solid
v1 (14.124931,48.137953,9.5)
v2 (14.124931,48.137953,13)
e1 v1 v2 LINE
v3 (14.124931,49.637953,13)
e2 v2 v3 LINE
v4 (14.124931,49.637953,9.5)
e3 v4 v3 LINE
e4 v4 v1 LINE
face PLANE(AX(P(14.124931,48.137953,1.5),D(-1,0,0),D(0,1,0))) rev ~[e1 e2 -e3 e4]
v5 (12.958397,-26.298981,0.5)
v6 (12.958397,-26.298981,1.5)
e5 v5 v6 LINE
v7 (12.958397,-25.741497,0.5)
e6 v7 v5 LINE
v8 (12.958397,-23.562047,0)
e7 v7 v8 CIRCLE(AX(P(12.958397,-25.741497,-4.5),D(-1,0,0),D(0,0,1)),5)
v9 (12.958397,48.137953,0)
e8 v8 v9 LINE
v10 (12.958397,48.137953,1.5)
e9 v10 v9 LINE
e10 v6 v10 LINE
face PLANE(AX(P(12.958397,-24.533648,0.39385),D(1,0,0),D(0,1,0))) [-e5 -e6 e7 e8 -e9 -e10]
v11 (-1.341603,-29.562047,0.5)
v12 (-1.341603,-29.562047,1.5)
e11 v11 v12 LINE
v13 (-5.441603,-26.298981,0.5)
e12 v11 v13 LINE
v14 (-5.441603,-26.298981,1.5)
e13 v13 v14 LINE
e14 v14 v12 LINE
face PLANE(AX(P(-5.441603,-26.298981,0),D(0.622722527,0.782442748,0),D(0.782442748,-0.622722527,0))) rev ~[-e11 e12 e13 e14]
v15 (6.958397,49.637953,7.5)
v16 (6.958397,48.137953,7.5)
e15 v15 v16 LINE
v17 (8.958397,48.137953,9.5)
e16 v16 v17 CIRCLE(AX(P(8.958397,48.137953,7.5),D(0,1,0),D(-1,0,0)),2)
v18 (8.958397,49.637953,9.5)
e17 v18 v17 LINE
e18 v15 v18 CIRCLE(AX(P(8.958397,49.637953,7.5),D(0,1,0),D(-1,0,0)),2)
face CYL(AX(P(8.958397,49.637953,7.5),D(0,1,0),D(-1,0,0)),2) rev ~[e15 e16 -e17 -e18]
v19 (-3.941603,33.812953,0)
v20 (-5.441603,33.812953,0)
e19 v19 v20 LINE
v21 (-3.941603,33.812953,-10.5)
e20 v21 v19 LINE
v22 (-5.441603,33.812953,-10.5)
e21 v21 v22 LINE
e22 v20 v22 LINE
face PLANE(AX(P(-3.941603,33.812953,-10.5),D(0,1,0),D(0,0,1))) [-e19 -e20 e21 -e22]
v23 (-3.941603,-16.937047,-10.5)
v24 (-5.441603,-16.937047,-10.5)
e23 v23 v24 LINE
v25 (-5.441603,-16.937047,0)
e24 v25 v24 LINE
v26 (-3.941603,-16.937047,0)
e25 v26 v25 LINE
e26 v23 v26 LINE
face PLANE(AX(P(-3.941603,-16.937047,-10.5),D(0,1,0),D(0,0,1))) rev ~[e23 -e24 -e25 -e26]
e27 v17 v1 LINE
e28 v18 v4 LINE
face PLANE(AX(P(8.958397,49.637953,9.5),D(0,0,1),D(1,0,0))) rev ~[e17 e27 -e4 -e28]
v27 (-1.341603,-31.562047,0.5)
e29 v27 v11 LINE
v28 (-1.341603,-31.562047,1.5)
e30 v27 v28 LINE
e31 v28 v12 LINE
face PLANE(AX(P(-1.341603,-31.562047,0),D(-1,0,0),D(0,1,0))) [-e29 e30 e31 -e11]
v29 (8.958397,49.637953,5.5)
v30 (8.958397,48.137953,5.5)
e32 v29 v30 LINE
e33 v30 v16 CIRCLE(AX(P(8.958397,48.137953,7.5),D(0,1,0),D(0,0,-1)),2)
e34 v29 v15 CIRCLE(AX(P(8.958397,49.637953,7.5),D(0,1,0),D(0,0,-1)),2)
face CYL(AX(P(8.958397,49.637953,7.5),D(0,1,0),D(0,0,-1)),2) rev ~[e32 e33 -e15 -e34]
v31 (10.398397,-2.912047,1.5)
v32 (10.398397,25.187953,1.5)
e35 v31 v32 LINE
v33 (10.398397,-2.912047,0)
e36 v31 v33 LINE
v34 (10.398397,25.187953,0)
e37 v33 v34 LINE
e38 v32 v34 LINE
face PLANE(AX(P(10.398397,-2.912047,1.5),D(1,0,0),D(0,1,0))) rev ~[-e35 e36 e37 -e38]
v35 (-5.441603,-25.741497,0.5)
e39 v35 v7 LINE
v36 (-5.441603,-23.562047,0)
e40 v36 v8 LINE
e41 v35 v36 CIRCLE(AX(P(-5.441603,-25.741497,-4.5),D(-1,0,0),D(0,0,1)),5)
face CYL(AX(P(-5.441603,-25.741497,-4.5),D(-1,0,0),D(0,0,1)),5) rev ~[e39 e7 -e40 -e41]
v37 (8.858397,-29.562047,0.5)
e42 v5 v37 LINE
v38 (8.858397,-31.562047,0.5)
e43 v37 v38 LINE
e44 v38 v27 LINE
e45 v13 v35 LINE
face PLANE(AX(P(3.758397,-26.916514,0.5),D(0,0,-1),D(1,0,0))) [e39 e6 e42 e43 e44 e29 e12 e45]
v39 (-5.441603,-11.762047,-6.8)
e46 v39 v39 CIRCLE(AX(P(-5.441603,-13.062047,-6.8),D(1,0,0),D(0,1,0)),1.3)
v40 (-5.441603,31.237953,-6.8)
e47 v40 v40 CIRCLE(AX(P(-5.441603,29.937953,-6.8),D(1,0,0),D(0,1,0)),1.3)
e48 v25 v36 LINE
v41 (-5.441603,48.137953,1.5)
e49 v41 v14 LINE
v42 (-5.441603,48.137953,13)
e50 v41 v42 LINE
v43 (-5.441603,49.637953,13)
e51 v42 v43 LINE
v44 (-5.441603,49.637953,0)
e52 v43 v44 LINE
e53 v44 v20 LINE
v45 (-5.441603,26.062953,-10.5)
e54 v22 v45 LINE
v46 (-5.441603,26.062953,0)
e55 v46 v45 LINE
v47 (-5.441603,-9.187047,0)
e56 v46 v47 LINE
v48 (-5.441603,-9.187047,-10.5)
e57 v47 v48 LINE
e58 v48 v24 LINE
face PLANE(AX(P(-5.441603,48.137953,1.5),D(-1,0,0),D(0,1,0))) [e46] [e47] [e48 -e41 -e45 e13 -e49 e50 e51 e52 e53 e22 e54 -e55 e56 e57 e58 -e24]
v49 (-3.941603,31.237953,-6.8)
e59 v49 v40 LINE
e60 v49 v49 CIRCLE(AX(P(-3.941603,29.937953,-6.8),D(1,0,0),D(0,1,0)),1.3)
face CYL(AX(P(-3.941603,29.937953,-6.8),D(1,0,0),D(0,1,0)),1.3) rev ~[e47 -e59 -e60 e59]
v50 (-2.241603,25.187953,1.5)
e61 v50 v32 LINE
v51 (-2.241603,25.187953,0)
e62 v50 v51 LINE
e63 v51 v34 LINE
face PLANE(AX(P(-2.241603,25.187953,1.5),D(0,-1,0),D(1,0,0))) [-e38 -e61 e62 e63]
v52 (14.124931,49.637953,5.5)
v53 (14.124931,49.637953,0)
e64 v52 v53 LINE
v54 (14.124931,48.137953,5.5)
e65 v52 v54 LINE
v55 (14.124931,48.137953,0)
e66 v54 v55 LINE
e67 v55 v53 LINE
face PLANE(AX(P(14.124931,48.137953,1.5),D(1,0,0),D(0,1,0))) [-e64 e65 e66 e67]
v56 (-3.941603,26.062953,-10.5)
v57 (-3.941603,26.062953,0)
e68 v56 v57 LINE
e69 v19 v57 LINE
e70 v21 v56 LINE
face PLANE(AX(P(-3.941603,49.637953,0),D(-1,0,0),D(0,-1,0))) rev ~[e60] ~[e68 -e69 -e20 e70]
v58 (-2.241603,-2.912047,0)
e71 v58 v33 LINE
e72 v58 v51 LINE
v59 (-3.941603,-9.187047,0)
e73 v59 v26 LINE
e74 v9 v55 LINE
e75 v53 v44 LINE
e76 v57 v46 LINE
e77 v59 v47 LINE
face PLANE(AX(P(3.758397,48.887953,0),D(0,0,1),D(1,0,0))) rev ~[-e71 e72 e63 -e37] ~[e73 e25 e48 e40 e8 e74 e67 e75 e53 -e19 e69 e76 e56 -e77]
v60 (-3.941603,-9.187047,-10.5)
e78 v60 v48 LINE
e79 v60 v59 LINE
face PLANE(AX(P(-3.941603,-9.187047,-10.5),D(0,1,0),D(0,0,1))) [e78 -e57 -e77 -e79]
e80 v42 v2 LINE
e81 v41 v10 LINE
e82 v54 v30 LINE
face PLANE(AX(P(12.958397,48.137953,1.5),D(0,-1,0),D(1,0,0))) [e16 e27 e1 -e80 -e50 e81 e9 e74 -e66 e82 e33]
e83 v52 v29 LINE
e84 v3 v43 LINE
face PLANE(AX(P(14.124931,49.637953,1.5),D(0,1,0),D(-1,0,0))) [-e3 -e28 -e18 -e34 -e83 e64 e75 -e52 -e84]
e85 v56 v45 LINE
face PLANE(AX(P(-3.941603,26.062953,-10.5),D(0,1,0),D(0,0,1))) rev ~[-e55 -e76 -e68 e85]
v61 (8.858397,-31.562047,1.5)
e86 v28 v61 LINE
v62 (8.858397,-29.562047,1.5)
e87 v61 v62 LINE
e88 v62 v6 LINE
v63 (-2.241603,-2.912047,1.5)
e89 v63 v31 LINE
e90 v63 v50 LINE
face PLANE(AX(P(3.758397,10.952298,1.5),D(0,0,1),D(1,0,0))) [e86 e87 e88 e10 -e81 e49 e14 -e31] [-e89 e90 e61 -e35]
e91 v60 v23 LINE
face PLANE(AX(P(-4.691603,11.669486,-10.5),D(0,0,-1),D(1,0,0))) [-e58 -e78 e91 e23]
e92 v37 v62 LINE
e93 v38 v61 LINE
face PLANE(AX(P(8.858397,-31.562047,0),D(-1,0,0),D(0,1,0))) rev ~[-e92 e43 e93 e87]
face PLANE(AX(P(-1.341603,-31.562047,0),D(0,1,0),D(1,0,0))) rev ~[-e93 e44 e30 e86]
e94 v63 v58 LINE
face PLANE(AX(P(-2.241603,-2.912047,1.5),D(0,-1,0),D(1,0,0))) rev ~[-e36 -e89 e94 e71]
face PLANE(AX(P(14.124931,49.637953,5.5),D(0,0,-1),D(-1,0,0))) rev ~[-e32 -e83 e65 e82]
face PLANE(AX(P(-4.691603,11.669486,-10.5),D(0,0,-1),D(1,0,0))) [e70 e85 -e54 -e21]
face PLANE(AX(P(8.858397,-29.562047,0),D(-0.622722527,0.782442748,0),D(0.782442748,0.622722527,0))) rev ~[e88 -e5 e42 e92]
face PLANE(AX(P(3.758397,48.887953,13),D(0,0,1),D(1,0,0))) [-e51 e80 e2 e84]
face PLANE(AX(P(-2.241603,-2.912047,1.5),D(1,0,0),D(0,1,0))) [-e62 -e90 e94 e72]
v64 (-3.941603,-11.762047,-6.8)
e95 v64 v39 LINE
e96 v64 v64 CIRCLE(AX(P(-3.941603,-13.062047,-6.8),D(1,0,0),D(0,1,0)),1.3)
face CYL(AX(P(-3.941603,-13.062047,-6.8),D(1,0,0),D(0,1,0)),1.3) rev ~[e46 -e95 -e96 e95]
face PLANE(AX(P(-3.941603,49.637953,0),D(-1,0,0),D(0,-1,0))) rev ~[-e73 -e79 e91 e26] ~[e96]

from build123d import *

# Parameters (mm, degrees)
F0_W         = 10.2
F0_H         = 2
F1_DEPTH     = 1.5
F2_W         = 12.64
F2_H         = 28.1
F3_DEPTH     = 25
F4_W         = 1.5
F4_H         = 75.9369339572
F5_DEPTH     = 10.5
F6_W         = 35.25
F6_H         = 10.5
F6_R         = 1.3
F6_W_2       = 15.825
F6_W_3       = 9.3619339572
F7_DEPTH     = 25
F9_DEPTH     = 0.5
F10_T1_DEPTH = 18.4
F11_W        = 18.4
F11_H        = 1.5
F11_W_2      = 1.1665335146
F12_DEPTH    = 11.5
F14_DEPTH    = 1.5
F15_DEPTH    = 1.5


# Not quite as in the source:
# - a fillet or chamfer that OpenCascade refuses, or shapes differently, is made with other operations: its cross-section is extruded or revolved along the edge and cut away or added


with BuildPart() as f1:
    # F0 (on Top) → F1 (new body)
    with BuildSketch(Plane.XY):
        Polygon((12.9583973216, 49.6379526287), (-5.4416026784, 49.6379526287), (-5.4416026784, -26.2989813285), (-1.3416026784, -29.5620473713), (8.8583973216, -29.5620473713), (12.9583973216, -26.2989813285), align=None)
        with Locations((3.7583973216, -30.5620473713)):
            Rectangle(F0_W, F0_H)
    extrude(amount=F1_DEPTH)

    # F2 (on face) → F3 (cut)
    with BuildSketch(Plane.XY.offset(1.5)):
        with Locations((4.0783973216, 11.1379526287)):
            Rectangle(F2_W, F2_H)
    extrude(amount=-F3_DEPTH, mode=Mode.SUBTRACT)

    # F4 (on face) → F5 (join)
    with BuildSketch(Plane(origin=(0, 0, 0), x_dir=(1, 0, 0), z_dir=(0, 0, -1))):
        with Locations((-4.6916026784, -11.6694856501)):
            Rectangle(F4_W, F4_H)
    extrude(amount=F5_DEPTH)

    # F6 (on face) → F7 (cut)
    with BuildSketch(Plane.YZ.offset(-3.9416026784)):
        with Locations((8.4379526287, -5.25)):
            Rectangle(F6_W, F6_H)
        with Locations((-13.0620473713, -6.8)):
            Circle(F6_R)
        with Locations((29.9379526287, -6.8)):
            Circle(F6_R)
        with Locations((41.7254526287, -5.25)):
            Rectangle(F6_W_2, F6_H)
        with Locations((-21.6180143499, -5.25)):
            Rectangle(F6_W_3, F6_H)
    extrude(amount=-F7_DEPTH, mode=Mode.SUBTRACT)

    # F8 (on face) → F9 (cut)
    with BuildSketch(Plane(origin=(0, 0, 0), x_dir=(1, 0, 0), z_dir=(0, 0, -1))):
        Polygon((-5.4416026784, 26.2989813285), (-5.4416026784, 23.5620473713), (12.9583973216, 23.5620473713), (12.9583973216, 26.2989813285), (8.8583973216, 29.5620473713), (8.8583973216, 31.5620473713), (-1.3416026784, 31.5620473713), (-1.3416026784, 29.5620473713), align=None)
    extrude(amount=-F9_DEPTH, mode=Mode.SUBTRACT)

    # F10: fillet of radius 5 on 1 edges, made by hand

    # F10_s2 → F10_t1 (join)
    with BuildSketch(Plane.YZ.offset(-5.4416026784)):
        with BuildLine():
            ThreePointArc((-25.7414968431, 0.5), (-24.6234628544, 0.3733971724), (-23.5620473713, 0))
            Line((-23.5620473713, 0), (-23.5620473713, 0.5))
            Line((-23.5620473713, 0.5), (-25.7414968431, 0.5))
        make_face()
    extrude(amount=F10_T1_DEPTH)

    # F11 (on face) → F12 (join)
    with BuildSketch(Plane.XY.offset(1.5)):
        with Locations((3.7583973216, 48.8879526287)):
            Rectangle(F11_W, F11_H)
        with Locations((13.5416640789, 48.8879526287)):
            Rectangle(F11_W_2, F11_H)
    extrude(amount=F12_DEPTH)

    # F13 (on face) → F14 (cut, through all)
    with BuildSketch(Plane(origin=(0, 49.6379526287, 0), x_dir=(-1, 0, 0), z_dir=(0, 1, 0))):
        with BuildLine():
            Line((-12.9583973216, 9.5), (-14.1249308363, 9.5))
            Line((-14.1249308363, 9.5), (-14.1249308363, 5.5))
            Line((-14.1249308363, 5.5), (-12.9583973216, 5.5))
            Line((-12.9583973216, 5.5), (-8.9583973216, 5.5))
            ThreePointArc((-8.9583973216, 5.5), (-10.9583973216, 7.5), (-8.9583973216, 9.5))
            Line((-8.9583973216, 9.5), (-12.9583973216, 9.5))
        make_face()
        with BuildLine():
            ThreePointArc((-6.9583973216, 7.5), (-7.5441837593, 8.9142135624), (-8.9583973216, 9.5))
            ThreePointArc((-8.9583973216, 9.5), (-10.9583973216, 7.5), (-8.9583973216, 5.5))
            ThreePointArc((-8.9583973216, 5.5), (-7.5441837593, 6.0857864376), (-6.9583973216, 7.5))
        make_face()
    extrude(amount=-F14_DEPTH, mode=Mode.SUBTRACT)

    # F15 (add, through all): a face of the model
    f15_faces = [f1.faces().sort_by_distance(p)[0] for p in [
        (13.5416640789, 48.8879526287, 1.5),
    ]]
    extrude(f15_faces, amount=F15_DEPTH)


solid = f1.part
